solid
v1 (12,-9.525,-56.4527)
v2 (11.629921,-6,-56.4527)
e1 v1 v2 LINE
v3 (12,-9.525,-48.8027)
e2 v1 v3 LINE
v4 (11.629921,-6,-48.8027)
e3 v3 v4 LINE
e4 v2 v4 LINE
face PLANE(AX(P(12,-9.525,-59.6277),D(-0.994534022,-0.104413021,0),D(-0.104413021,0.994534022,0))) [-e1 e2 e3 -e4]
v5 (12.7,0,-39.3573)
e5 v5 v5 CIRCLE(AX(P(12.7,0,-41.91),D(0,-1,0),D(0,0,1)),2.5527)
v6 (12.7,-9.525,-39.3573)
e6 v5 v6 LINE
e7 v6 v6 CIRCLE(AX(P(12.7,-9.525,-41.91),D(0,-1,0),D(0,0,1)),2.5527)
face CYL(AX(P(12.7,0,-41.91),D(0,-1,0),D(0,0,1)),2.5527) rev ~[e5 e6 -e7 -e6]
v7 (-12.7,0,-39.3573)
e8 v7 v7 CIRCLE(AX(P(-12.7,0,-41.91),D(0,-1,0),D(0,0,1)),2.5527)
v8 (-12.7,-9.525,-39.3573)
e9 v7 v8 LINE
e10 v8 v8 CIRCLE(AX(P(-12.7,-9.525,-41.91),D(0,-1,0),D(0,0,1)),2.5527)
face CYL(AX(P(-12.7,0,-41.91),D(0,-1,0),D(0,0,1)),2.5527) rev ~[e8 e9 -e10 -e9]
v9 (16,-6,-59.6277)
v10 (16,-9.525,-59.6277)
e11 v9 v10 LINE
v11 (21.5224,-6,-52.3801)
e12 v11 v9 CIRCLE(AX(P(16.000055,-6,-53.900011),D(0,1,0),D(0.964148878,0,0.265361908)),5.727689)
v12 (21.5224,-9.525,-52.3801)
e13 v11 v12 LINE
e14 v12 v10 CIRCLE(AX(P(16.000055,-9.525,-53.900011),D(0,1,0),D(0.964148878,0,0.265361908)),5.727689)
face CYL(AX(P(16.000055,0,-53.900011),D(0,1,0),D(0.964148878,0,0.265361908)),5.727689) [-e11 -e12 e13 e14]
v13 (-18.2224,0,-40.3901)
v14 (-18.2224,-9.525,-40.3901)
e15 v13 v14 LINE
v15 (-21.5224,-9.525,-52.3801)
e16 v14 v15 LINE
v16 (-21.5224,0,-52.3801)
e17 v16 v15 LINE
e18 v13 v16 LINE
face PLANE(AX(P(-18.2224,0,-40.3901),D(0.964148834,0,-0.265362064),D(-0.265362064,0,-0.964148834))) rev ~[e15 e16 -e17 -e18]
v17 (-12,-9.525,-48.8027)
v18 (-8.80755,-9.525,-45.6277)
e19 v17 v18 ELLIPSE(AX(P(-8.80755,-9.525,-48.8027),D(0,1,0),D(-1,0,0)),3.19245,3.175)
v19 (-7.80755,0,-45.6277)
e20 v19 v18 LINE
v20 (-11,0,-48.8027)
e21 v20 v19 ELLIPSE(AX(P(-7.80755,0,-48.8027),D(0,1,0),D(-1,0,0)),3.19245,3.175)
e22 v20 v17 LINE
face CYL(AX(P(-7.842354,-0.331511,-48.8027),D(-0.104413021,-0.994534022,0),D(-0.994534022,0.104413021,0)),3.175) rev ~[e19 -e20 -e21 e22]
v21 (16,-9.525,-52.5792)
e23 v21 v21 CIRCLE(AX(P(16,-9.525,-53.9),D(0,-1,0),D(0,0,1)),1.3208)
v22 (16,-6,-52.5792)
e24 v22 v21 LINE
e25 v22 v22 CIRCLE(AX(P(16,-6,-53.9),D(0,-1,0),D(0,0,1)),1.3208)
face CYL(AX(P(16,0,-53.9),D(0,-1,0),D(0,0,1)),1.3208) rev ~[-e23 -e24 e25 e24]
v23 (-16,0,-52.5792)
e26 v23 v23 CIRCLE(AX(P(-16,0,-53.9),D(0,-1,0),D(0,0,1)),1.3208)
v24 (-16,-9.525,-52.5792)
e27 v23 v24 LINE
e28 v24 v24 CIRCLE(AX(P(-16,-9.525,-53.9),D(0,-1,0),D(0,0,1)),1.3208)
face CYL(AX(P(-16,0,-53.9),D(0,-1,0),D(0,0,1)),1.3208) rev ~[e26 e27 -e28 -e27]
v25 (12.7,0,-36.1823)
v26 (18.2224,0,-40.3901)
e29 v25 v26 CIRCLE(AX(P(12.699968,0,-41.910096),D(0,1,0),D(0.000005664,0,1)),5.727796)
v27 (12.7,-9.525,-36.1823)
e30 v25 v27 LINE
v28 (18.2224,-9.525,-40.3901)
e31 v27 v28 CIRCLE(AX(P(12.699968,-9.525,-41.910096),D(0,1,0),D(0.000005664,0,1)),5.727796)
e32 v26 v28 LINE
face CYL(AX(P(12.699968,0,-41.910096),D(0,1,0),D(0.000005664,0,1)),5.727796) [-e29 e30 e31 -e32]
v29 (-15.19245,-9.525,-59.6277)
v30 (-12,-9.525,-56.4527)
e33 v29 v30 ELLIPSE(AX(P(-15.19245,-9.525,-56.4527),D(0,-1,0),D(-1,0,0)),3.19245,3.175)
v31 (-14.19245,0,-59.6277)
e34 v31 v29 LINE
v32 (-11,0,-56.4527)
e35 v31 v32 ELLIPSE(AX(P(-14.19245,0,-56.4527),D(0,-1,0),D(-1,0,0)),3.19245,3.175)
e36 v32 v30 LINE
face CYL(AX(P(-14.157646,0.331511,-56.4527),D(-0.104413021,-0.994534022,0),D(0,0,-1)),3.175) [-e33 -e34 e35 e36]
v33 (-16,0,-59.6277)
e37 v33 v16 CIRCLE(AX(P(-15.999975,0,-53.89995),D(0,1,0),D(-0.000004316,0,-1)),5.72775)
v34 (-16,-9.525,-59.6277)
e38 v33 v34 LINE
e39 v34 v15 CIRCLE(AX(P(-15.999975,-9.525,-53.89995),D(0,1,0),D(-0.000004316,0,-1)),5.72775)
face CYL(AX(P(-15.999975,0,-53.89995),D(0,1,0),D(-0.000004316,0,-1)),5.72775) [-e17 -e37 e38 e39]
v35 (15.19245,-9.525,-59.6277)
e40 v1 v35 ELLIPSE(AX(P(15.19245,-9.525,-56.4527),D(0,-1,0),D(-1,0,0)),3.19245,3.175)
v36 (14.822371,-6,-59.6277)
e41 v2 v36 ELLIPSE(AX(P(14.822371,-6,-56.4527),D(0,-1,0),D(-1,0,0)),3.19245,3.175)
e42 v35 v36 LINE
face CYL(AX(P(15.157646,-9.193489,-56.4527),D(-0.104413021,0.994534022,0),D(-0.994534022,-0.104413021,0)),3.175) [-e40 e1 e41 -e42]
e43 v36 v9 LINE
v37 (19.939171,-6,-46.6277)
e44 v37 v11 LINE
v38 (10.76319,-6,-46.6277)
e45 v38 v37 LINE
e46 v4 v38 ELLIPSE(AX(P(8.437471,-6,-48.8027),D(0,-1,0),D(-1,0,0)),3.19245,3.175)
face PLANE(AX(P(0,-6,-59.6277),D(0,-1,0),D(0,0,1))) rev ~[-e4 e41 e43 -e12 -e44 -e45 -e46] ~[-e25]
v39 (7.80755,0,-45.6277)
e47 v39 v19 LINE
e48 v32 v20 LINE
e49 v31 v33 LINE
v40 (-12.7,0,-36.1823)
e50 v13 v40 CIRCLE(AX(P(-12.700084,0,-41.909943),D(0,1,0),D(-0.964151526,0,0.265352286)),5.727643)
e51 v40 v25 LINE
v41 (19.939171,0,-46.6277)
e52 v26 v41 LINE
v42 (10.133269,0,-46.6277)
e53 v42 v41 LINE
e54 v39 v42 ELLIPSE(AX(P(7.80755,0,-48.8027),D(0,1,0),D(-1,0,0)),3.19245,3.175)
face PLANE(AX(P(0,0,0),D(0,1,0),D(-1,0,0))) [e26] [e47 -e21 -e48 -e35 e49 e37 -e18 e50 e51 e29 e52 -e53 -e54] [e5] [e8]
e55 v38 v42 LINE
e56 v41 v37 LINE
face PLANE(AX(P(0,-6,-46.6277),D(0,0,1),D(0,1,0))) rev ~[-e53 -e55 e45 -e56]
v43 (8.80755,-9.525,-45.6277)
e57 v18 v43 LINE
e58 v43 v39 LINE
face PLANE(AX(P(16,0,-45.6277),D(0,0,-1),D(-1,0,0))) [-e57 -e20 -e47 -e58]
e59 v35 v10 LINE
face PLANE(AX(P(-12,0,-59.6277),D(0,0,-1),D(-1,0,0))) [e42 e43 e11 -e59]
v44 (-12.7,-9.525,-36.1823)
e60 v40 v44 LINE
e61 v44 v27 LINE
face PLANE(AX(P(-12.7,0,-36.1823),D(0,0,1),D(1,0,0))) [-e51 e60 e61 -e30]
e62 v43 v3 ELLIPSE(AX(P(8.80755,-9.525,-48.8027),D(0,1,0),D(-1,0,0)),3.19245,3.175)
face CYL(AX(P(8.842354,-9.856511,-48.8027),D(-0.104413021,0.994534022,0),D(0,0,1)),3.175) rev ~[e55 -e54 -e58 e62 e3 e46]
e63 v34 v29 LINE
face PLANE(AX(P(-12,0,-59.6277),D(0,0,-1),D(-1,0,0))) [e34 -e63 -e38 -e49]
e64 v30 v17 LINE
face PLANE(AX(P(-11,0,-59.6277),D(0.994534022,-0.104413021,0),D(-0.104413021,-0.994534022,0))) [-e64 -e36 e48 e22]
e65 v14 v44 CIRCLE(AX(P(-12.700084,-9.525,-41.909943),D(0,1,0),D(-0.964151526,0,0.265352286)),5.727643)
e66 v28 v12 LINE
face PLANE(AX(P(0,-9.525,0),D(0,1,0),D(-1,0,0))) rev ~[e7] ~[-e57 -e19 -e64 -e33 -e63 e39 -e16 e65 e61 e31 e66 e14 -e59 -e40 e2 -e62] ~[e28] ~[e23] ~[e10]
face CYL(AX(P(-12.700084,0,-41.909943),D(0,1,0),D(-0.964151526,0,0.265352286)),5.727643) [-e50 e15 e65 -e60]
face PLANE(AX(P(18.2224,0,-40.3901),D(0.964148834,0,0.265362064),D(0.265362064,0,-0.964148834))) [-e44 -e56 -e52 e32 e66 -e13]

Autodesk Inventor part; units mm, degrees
ref_plane "YZ Plane" through (0, 0, 0) normal (1, 0, 0) x (0, 1, 0)
ref_plane "XZ Plane" through (0, 0, 0) normal (0, 1, 0) x (-1, 0, 0)
ref_plane "XY Plane" through (0, 0, 0) normal (0, 0, 1) x (1, 0, 0)
sketch "Sketch1" plane through (0, 0, 0) normal (0, 1, 0) x (-1, 0, 0)
  circle A0 centre (0, 0) radius 14.351 construction
  line L0 (-12.7, -34.925) -> (12.7, -34.925) construction
  circle A1 centre (0, 0) radius 22.225 construction
  circle A2 centre (0, 0) radius 31.75 construction
  circle A3 centre (-15.875, -27.4963) radius 4.7625 construction
  arc A4 (-20.4289, -28.8903) -> (-25.4478, -18.9862) centre (-51.4511, -38.3868) ccw construction
  arc A5 (-3.7186, -31.5315) -> (-14.8053, -32.1371) centre (-7.5184, -63.7513) ccw construction
  line L1 (0, 0) -> (0, -22.225) construction
  circle A6 centre (15.875, -27.4963) radius 4.7625 construction
  arc A7 (25.4478, -18.9862) -> (20.4289, -28.8903) centre (51.4511, -38.3868) ccw construction
  arc A8 (14.8053, -32.1371) -> (3.7186, -31.5315) centre (7.5184, -63.7513) ccw construction
  circle A9 centre (-12.7, -34.925) radius 2.5527 construction
  circle A10 centre (-12.7, -34.925) radius 3.1548 construction
  circle A11 centre (12.7, -34.925) radius 3.1548 construction
  line L2 (-16, -53.9) -> (16, -53.9) construction
  circle A12 centre (0, 0) radius 53.9 construction
  circle A13 centre (0, -40.64) radius 2.5527 construction
  circle A14 centre (12.7, -41.91) radius 2.5527 construction
  point P0 (0, -34.925)
  point P1 (31.75, 0)
  point P2 (15.875, 27.4963)
  point P3 (-15.875, 27.4963)
  point P4 (-31.75, 0)
  point P5 (15.875, -27.4963)
  point P6 (0, -53.9)
  point P7 (0, -53.9)
  point P8 (-12.7, -41.91)
  dimension "d3" = 44.45
  dimension "d16" = 107.8
  dimension "d0" = 28.702
  dimension "d1" = 25.4
  dimension "d2" = 34.925
  dimension "d4" = 63.5
  dimension "d7" = 360
  dimension "d9" = 9.525
  dimension "d10" = 32.4431
  dimension "d11" = 32.4431
  dimension "d12" = 5.1054
  dimension "d14" = 0.6021
  dimension "d15" = 32
  dimension "d18" = 40.64
  dimension "d19" = 5.1054
  dimension "d20" = 6.985
  dimension "d21" = 5.1054
sketch "Sketch2" plane through (0, 0, 0) normal (0, 1, 0) x (-1, 0, 0)
  circle A0 centre (12.7, -41.91) radius 2.5527 construction
  circle A1 centre (12.7, -41.91) radius 5.7277 construction
  circle A2 centre (16, -53.9) radius 5.7277 construction
  line L0 (18.2224, -40.3901) -> (21.5224, -52.3801)
  circle A3 centre (-12.7, -41.91) radius 5.7277 construction
  circle A4 centre (-16, -53.9) radius 5.7277 construction
  line L1 (12.7, -36.1823) -> (-12.7, -36.1823)
  line L2 (-18.2224, -40.3901) -> (-21.5224, -52.3801)
  line L3 (-16, -59.6277) -> (16, -59.6277)
  arc A5 (18.2224, -40.3901) -> (12.7, -36.1823) centre (12.7, -41.91) ccw
  arc A6 (16, -59.6277) -> (21.5224, -52.3801) centre (16, -53.9) ccw
  arc A7 (-21.5224, -52.3801) -> (-16, -59.6277) centre (-16, -53.9) ccw
  arc A8 (-12.7, -36.1823) -> (-18.2224, -40.3901) centre (-12.7, -41.91) ccw
  line L4 (-12, -59.6277) -> (-12, -44.1197) construction
  line L5 (-12, -44.1197) -> (12, -44.1197) construction
  line L6 (12, -44.1197) -> (12, -59.6277) construction
  line L7 (12, -59.6277) -> (-12, -59.6277)
  line L8 (11, -44.1197) -> (-11, -44.1197)
  line L9 (-11, -44.1197) -> (-12, -59.6277)
  line L10 (11, -44.1197) -> (12, -59.6277)
  point P0 (0, 0)
  point P1 (0, -59.6277)
  point P2 (12, -59.6277)
  point P3 (0, -44.1197)
  point P4 (0, -44.1197)
  point P5 (12, -59.6277)
  dimension "d22" = 5.1054
  dimension "d23" = 3.175
  dimension "d40" = 24
  dimension "d41" = 15.508
  dimension "d45" = 22
extrude "Extrusion1" add sketch "Sketch2" against normal blind 9.525
hole "Hole1" at (-12.7, 0, -41.91) at (12.7, 0, -41.91) direction (0, -1, 0) diameter 5.1054 end through all clearance for "Flat Head Machine Screw (82)" size "#10" standard "Ansi Unified Screw Threads"
hole "Hole2" at (16, 0, -53.9) at (-16, 0, -53.9) direction (0, -1, 0) diameter 2.6416 end through all thread size "6-32 UNC" class "2B" standard "ANSI Unified Screw Threads"
sketch "Sketch3" plane through (0, -9.525, 0) normal (0, -1, 0) x (1, 0, 0)
  point P0 (0, 0)
sketch "Sketch4" plane through (16, 0, -59.6277) normal (0, 0, -1) x (-1, 0, 0)
  line L0 (28.7, 0) -> (3.3, 0) construction
  line L1 (5, 0) -> (27, 0)
  line L2 (27, 0) -> (28, -9.525)
  line L3 (28, -9.525) -> (4, -9.525)
  line L4 (3.3, -9.525) -> (28.7, -9.525) construction
  line L5 (4, -9.525) -> (5, 0)
  point P0 (16, 0)
  point P1 (16, 0)
  point P2 (16, -9.525)
  point P3 (16, -9.525)
  dimension "d46" = 22
  dimension "d47" = 24
extrude "Extrusion3" cut sketch "Sketch4" against normal blind 14
fillet "Fillet2" radius 3.175 4 edges at (11.5, -4.7625, -45.6277) (-11.5, -4.7625, -45.6277) (-11.5, -4.7625, -59.6277) (11.5, -4.7625, -59.6277)
sketch "Sketch5" plane through (0, 0, 0) normal (1, 0, 0) x (0, 1, 0)
  line L0 (-9.525, -45.6277) -> (-9.525, -36.1823) construction
  line L1 (-9.525, -36.1823) -> (0, -36.1823) construction
  line L2 (0, -36.1823) -> (0, -45.6277) construction
  line L3 (0, -45.6277) -> (-9.525, -45.6277) construction
  line L4 (0, -59.6277) -> (-6, -59.6277)
  line L5 (-6, -59.6277) -> (-6, -46.6277)
  line L6 (-6, -46.6277) -> (0, -46.6277)
  line L7 (0, -46.6277) -> (0, -59.6277)
  line L8 (-9.525, -59.6277) -> (0, -59.6277) construction
  line L9 (-9.525, -56.4527) -> (-9.525, -48.8027) construction
  point P0 (0, 0)
  dimension "d55" = 6
  dimension "d56" = 13
extrude "Extrusion4" cut sketch "Sketch5" along normal blind 25.4
equation "\"d11\" = d10"
properties part number "AR-020" material "ABS Plastic"
